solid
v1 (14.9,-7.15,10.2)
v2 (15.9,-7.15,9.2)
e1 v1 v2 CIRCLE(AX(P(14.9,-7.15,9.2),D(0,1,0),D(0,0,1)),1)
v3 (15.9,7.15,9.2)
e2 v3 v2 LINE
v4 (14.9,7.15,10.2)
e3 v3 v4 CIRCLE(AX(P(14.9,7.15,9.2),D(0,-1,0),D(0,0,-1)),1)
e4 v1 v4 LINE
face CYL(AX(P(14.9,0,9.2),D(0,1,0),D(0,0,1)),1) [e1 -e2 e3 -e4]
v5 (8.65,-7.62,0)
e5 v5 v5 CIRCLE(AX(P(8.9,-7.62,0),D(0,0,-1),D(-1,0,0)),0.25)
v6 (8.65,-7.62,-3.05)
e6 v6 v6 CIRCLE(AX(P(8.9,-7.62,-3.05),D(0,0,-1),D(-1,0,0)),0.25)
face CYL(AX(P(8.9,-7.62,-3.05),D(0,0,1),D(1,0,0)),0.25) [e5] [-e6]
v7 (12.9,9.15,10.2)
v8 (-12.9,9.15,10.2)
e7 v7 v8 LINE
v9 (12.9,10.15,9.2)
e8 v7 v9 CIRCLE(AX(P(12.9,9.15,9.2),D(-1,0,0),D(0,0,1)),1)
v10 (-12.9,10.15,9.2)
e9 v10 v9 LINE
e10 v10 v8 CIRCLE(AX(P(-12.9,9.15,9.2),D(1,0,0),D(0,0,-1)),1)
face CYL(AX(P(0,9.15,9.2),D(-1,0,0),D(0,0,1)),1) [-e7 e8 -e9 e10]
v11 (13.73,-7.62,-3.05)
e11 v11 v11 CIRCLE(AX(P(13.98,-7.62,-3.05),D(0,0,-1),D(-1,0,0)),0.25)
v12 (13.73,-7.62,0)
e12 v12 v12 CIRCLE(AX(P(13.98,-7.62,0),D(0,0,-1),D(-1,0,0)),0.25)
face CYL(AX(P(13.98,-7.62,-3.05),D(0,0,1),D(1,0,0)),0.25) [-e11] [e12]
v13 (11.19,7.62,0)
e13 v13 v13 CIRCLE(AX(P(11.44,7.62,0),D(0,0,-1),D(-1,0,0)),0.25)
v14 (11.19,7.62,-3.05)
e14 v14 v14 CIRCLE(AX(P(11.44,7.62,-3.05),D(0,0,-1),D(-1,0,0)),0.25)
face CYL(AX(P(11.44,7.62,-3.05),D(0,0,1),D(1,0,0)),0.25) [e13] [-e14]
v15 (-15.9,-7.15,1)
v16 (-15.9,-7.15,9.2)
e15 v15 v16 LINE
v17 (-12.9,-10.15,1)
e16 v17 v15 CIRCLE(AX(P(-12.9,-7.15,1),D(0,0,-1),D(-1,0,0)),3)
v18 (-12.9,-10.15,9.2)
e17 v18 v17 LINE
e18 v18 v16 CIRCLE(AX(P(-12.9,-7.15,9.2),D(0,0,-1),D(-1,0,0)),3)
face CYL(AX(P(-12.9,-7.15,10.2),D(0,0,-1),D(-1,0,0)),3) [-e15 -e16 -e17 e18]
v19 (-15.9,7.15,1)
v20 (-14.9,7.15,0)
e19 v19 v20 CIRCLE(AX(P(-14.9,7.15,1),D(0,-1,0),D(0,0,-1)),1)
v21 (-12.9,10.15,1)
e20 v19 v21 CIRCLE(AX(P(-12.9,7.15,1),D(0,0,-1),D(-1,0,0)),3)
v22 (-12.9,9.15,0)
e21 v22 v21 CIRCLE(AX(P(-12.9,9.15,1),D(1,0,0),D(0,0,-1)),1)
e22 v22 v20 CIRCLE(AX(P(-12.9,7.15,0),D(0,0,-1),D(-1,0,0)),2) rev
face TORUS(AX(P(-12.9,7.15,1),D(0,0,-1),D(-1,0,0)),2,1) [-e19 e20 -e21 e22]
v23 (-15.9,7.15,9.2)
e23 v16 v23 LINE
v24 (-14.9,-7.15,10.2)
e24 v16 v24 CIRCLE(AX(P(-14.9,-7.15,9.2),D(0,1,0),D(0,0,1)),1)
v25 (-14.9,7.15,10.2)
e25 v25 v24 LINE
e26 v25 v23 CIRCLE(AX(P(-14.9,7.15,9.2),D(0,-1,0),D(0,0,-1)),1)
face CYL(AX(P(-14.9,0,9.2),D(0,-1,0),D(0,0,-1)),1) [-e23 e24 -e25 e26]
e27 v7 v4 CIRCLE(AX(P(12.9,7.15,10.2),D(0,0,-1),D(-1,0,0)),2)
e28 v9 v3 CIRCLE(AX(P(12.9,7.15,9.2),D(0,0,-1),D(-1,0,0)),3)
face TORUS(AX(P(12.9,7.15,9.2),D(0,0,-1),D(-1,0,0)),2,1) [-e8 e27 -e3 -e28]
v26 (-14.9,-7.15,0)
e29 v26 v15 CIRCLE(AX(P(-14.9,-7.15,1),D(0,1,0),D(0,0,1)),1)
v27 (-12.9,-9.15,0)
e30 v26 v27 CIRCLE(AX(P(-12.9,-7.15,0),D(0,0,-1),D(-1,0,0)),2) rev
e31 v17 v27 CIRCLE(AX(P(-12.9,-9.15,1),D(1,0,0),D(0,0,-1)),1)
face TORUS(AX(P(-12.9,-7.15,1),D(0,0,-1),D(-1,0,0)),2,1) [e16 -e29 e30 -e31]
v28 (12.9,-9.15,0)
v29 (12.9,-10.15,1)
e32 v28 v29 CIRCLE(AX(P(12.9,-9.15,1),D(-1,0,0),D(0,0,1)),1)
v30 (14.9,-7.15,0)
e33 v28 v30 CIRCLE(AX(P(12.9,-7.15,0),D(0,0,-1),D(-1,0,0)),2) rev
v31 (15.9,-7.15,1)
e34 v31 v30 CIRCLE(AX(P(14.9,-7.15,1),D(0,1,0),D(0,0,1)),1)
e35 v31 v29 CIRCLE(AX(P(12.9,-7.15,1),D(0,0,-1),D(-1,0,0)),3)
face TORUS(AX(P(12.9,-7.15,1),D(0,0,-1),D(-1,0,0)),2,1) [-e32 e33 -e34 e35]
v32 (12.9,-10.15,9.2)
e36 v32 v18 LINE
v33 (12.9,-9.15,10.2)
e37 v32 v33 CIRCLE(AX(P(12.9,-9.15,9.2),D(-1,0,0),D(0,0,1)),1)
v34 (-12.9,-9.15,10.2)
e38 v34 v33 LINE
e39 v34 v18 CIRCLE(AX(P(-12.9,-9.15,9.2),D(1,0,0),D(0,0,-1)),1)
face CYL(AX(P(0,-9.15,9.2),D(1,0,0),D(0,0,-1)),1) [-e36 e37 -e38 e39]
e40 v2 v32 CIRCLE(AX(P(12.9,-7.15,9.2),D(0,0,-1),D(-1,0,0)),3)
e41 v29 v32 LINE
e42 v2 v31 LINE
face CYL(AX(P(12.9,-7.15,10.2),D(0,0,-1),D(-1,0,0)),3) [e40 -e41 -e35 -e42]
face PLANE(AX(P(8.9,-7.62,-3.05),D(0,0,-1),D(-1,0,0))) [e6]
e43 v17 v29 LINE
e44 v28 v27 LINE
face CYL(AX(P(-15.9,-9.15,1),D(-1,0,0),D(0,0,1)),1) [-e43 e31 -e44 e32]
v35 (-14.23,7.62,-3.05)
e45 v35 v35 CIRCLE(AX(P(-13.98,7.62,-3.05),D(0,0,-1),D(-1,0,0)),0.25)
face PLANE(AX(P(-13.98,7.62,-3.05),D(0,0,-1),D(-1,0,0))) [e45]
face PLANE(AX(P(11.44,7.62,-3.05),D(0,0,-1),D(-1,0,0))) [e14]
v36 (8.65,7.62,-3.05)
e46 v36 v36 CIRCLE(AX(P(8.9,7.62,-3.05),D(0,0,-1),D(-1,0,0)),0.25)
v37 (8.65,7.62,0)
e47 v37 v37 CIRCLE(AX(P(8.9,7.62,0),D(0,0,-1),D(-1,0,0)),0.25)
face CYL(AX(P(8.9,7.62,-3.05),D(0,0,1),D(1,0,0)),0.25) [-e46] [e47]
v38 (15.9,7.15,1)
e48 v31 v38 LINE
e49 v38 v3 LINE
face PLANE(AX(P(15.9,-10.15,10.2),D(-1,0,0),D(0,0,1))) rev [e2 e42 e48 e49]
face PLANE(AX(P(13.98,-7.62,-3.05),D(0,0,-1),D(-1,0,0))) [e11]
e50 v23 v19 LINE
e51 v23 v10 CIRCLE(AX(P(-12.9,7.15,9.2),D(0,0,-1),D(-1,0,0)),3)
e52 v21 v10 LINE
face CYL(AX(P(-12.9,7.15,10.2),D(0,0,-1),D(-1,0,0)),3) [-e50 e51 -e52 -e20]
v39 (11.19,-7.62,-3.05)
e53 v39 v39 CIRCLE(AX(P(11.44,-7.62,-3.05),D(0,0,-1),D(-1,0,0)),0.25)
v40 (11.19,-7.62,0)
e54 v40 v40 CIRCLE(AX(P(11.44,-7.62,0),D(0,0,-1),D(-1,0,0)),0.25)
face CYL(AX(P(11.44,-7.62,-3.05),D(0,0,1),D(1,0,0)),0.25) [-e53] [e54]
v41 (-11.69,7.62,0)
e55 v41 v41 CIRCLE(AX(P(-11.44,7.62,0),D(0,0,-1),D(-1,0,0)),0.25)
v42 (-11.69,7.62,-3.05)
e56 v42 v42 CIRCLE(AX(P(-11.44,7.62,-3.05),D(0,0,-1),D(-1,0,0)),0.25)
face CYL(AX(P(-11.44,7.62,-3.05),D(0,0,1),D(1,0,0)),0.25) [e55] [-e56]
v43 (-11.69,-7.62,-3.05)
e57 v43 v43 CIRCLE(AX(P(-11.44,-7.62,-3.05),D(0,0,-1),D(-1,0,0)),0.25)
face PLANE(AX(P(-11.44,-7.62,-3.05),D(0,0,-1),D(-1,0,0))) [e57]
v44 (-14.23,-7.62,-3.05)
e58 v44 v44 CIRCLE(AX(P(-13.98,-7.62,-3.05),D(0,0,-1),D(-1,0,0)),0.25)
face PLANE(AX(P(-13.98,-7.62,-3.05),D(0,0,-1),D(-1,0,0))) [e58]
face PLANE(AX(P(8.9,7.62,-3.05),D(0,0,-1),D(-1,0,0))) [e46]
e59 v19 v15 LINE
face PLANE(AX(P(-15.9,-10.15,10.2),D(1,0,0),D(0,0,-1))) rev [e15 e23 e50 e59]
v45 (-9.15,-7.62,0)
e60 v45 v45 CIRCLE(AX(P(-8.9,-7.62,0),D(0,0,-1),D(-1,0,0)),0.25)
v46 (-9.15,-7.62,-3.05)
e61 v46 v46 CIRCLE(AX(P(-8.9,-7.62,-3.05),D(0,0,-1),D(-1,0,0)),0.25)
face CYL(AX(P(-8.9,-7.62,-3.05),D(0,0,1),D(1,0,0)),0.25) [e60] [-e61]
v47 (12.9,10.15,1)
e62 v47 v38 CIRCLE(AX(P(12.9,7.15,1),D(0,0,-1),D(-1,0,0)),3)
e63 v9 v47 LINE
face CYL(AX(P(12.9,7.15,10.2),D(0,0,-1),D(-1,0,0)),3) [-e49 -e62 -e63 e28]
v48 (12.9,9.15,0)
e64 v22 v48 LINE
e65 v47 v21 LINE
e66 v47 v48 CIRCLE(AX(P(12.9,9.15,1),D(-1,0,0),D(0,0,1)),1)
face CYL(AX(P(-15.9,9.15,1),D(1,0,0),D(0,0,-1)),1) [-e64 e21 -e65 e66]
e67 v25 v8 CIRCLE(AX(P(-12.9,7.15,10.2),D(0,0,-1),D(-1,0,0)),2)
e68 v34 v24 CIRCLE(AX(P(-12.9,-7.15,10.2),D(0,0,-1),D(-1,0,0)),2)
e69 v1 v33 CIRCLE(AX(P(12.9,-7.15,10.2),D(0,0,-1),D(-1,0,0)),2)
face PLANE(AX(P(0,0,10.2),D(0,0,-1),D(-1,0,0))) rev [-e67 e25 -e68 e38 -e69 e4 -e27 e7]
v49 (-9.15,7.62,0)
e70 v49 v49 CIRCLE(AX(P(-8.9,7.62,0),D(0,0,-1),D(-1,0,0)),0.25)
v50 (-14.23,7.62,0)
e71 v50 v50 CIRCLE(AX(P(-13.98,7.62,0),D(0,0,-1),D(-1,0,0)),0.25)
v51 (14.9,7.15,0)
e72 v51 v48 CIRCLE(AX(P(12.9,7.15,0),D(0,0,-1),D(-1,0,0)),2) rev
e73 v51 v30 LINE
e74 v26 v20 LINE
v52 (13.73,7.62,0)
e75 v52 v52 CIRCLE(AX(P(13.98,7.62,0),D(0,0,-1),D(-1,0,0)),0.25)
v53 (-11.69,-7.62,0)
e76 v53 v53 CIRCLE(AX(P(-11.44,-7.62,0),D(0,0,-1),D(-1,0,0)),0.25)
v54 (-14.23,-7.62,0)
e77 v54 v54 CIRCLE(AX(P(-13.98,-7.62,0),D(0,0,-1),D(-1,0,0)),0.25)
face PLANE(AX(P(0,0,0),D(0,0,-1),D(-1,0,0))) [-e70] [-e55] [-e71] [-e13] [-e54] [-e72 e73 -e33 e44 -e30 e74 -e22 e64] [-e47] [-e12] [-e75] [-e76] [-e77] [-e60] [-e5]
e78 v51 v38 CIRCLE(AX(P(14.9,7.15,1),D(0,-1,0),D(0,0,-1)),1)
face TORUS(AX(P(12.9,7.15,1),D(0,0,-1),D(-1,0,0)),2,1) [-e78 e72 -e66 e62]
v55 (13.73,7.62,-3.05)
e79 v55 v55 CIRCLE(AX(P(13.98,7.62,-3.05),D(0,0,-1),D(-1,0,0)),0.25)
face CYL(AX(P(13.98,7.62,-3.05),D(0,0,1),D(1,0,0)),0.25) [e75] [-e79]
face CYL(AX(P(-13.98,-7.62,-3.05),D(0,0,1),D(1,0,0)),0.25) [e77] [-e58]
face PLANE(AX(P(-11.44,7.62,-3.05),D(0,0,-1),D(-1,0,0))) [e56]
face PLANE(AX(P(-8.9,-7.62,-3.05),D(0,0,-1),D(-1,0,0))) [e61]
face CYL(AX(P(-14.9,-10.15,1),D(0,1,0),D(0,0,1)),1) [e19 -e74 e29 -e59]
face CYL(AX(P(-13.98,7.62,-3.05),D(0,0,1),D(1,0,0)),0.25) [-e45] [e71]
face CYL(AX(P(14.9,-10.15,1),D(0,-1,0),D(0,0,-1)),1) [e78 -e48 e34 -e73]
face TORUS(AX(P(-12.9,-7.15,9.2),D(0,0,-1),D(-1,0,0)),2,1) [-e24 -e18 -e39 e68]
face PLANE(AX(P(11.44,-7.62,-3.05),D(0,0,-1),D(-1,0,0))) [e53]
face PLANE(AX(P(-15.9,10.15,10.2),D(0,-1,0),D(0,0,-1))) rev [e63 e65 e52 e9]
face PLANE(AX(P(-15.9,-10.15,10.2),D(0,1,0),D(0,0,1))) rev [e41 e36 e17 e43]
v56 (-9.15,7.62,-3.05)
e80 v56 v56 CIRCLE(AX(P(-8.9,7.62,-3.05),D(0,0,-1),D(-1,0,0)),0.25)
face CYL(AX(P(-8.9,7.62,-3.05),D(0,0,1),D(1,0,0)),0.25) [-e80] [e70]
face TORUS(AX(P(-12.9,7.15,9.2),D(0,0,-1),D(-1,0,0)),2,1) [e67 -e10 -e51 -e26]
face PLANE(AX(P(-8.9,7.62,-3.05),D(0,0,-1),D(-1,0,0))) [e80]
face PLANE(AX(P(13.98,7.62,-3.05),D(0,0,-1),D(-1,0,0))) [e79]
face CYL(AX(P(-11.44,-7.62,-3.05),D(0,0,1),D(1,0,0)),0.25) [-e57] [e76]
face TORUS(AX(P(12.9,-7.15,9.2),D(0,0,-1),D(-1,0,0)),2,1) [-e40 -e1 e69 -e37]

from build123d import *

# Parameters (mm, degrees)
SKETCH_1_W      = 31.8
SKETCH_1_H      = 20.3
EXTRUDE_1_DEPTH = 10.2
FILLET_2_R      = 1
FILLET_1_R      = 3
SKETCH_2_R      = 0.25
EXTRUDE_2_DEPTH = 3.05


with BuildPart() as part:
    # Эскиз1 → Бобышка-Вытянуть1 (new body)
    with BuildSketch(Plane.XY):
        Rectangle(SKETCH_1_W, SKETCH_1_H)
    extrude(amount=EXTRUDE_1_DEPTH)

    # Скругление2
    fillet_2_edges = [part.edges().sort_by_distance(p)[0] for p in [
        (-15.9, 0, 10.2),
        (0, -10.15, 10.2),
        (15.9, 0, 10.2),
        (0, -10.15, 0),
        (-15.9, 0, 0),
        (0, 10.15, 0),
        (15.9, 0, 0),
        (0, 10.15, 10.2),
    ]]
    fillet(fillet_2_edges, radius=FILLET_2_R)

    # Скругление1
    # the kernel refuses this fillet: 3 mm, written as the material it takes off along each edge
    with BuildSketch(Plane(origin=(12.9, -7.15, 0), x_dir=(1, 0, 0), z_dir=(0, 1, 0))) as fillet_1_piece_1:
        with BuildLine():
            CenterArc((2, -1), 1, 0, 90)
            Line((3, -1), (3, 0))
            Line((3, 0), (2, 0))
        make_face()
    revolve(axis=Axis((12.9, -7.15, 0), (0, 0, -1)), revolution_arc=90, mode=Mode.SUBTRACT)
    with BuildSketch(Plane(origin=(-12.9, -7.15, 0), x_dir=(0, -1, 0), z_dir=(1, 0, 0))) as fillet_1_piece_2:
        with BuildLine():
            CenterArc((2, -1), 1, 0, 90)
            Line((3, -1), (3, 0))
            Line((3, 0), (2, 0))
        make_face()
    revolve(axis=Axis((-12.9, -7.15, 0), (0, 0, -1)), revolution_arc=90, mode=Mode.SUBTRACT)
    with BuildSketch(Plane(origin=(12.9, 7.15, 0), x_dir=(0, 1, 0), z_dir=(-1, 0, 0))) as fillet_1_piece_3:
        with BuildLine():
            CenterArc((2, -1), 1, 0, 90)
            Line((3, -1), (3, 0))
            Line((3, 0), (2, 0))
        make_face()
    revolve(axis=Axis((12.9, 7.15, 0), (0, 0, -1)), revolution_arc=90, mode=Mode.SUBTRACT)
    with BuildSketch(Plane(origin=(-12.9, 7.15, 0), x_dir=(-1, 0, 0), z_dir=(0, -1, 0))) as fillet_1_piece_4:
        with BuildLine():
            CenterArc((2, -1), 1, 0, 90)
            Line((3, -1), (3, 0))
            Line((3, 0), (2, 0))
        make_face()
    revolve(axis=Axis((-12.9, 7.15, 0), (0, 0, -1)), revolution_arc=90, mode=Mode.SUBTRACT)
    with BuildSketch(Plane(origin=(12.9, -7.15, 10.2), x_dir=(0, -1, 0), z_dir=(-1, 0, 0))) as fillet_1_piece_5:
        with BuildLine():
            CenterArc((2, -1), 1, 0, 90)
            Line((3, -1), (3, 0))
            Line((3, 0), (2, 0))
        make_face()
    revolve(axis=Axis((12.9, -7.15, 10.2), (0, 0, 1)), revolution_arc=90, mode=Mode.SUBTRACT)
    with BuildSketch(Plane(origin=(-12.9, -7.15, 10.2), x_dir=(-1, 0, 0), z_dir=(0, 1, 0))) as fillet_1_piece_6:
        with BuildLine():
            CenterArc((2, -1), 1, 0, 90)
            Line((3, -1), (3, 0))
            Line((3, 0), (2, 0))
        make_face()
    revolve(axis=Axis((-12.9, -7.15, 10.2), (0, 0, 1)), revolution_arc=90, mode=Mode.SUBTRACT)
    with BuildSketch(Plane(origin=(12.9, 7.15, 10.2), x_dir=(1, 0, 0), z_dir=(0, -1, 0))) as fillet_1_piece_7:
        with BuildLine():
            CenterArc((2, -1), 1, 0, 90)
            Line((3, -1), (3, 0))
            Line((3, 0), (2, 0))
        make_face()
    revolve(axis=Axis((12.9, 7.15, 10.2), (0, 0, 1)), revolution_arc=90, mode=Mode.SUBTRACT)
    with BuildSketch(Plane(origin=(-12.9, 7.15, 10.2), x_dir=(0, 1, 0), z_dir=(1, 0, 0))) as fillet_1_piece_8:
        with BuildLine():
            CenterArc((2, -1), 1, 0, 90)
            Line((3, -1), (3, 0))
            Line((3, 0), (2, 0))
        make_face()
    revolve(axis=Axis((-12.9, 7.15, 10.2), (0, 0, 1)), revolution_arc=90, mode=Mode.SUBTRACT)
    with BuildSketch(Plane(origin=(-15.9, 10.15, 0), x_dir=(0, -1, 0), z_dir=(0, 0, 1)), Plane(origin=(-15.9, -10.15, 0), x_dir=(1, 0, 0), z_dir=(0, 0, 1))) as fillet_1_piece_9:
        with BuildLine():
            CenterArc((FILLET_1_R, FILLET_1_R), FILLET_1_R, 180, 90)
            Line((0, FILLET_1_R), (0, 0))
            Line((0, 0), (FILLET_1_R, 0))
        make_face()
    extrude(amount=10.2, mode=Mode.SUBTRACT)
    with BuildSketch(Plane(origin=(15.9, 10.15, 0), x_dir=(0, -1, 0), z_dir=(0, 0, 1)), Plane(origin=(15.9, -10.15, 0), x_dir=(-1, 0, 0), z_dir=(0, 0, 1))) as fillet_1_piece_10:
        with BuildLine():
            CenterArc((FILLET_1_R, -FILLET_1_R), FILLET_1_R, 90, 90)
            Line((0, -FILLET_1_R), (0, 0))
            Line((0, 0), (FILLET_1_R, 0))
        make_face()
    extrude(amount=10.2, mode=Mode.SUBTRACT)

    # Эскиз2 → Бобышка-Вытянуть2 (add)
    with BuildSketch(Plane(origin=(0, 0, 0), x_dir=(-1, 0, 0), z_dir=(0, 0, -1))):
        with Locations((13.98, 7.62)):
            Circle(SKETCH_2_R)
        with Locations((8.9, 7.62)):
            Circle(SKETCH_2_R)
        with Locations((-11.44, 7.62)):
            Circle(SKETCH_2_R)
        with Locations((-13.98, 7.62)):
            Circle(SKETCH_2_R)
        with Locations((-13.98, -7.62)):
            Circle(SKETCH_2_R)
        with Locations((-11.44, -7.62)):
            Circle(SKETCH_2_R)
        with Locations((8.9, -7.62)):
            Circle(SKETCH_2_R)
        with Locations((13.98, -7.62)):
            Circle(SKETCH_2_R)
        with Locations((-8.9, 7.62)):
            Circle(SKETCH_2_R)
        with Locations((-8.9, -7.62)):
            Circle(SKETCH_2_R)
        with Locations((11.44, 7.62)):
            Circle(SKETCH_2_R)
        with Locations((11.44, -7.62)):
            Circle(SKETCH_2_R)
    extrude(amount=EXTRUDE_2_DEPTH)


solid = part.part
